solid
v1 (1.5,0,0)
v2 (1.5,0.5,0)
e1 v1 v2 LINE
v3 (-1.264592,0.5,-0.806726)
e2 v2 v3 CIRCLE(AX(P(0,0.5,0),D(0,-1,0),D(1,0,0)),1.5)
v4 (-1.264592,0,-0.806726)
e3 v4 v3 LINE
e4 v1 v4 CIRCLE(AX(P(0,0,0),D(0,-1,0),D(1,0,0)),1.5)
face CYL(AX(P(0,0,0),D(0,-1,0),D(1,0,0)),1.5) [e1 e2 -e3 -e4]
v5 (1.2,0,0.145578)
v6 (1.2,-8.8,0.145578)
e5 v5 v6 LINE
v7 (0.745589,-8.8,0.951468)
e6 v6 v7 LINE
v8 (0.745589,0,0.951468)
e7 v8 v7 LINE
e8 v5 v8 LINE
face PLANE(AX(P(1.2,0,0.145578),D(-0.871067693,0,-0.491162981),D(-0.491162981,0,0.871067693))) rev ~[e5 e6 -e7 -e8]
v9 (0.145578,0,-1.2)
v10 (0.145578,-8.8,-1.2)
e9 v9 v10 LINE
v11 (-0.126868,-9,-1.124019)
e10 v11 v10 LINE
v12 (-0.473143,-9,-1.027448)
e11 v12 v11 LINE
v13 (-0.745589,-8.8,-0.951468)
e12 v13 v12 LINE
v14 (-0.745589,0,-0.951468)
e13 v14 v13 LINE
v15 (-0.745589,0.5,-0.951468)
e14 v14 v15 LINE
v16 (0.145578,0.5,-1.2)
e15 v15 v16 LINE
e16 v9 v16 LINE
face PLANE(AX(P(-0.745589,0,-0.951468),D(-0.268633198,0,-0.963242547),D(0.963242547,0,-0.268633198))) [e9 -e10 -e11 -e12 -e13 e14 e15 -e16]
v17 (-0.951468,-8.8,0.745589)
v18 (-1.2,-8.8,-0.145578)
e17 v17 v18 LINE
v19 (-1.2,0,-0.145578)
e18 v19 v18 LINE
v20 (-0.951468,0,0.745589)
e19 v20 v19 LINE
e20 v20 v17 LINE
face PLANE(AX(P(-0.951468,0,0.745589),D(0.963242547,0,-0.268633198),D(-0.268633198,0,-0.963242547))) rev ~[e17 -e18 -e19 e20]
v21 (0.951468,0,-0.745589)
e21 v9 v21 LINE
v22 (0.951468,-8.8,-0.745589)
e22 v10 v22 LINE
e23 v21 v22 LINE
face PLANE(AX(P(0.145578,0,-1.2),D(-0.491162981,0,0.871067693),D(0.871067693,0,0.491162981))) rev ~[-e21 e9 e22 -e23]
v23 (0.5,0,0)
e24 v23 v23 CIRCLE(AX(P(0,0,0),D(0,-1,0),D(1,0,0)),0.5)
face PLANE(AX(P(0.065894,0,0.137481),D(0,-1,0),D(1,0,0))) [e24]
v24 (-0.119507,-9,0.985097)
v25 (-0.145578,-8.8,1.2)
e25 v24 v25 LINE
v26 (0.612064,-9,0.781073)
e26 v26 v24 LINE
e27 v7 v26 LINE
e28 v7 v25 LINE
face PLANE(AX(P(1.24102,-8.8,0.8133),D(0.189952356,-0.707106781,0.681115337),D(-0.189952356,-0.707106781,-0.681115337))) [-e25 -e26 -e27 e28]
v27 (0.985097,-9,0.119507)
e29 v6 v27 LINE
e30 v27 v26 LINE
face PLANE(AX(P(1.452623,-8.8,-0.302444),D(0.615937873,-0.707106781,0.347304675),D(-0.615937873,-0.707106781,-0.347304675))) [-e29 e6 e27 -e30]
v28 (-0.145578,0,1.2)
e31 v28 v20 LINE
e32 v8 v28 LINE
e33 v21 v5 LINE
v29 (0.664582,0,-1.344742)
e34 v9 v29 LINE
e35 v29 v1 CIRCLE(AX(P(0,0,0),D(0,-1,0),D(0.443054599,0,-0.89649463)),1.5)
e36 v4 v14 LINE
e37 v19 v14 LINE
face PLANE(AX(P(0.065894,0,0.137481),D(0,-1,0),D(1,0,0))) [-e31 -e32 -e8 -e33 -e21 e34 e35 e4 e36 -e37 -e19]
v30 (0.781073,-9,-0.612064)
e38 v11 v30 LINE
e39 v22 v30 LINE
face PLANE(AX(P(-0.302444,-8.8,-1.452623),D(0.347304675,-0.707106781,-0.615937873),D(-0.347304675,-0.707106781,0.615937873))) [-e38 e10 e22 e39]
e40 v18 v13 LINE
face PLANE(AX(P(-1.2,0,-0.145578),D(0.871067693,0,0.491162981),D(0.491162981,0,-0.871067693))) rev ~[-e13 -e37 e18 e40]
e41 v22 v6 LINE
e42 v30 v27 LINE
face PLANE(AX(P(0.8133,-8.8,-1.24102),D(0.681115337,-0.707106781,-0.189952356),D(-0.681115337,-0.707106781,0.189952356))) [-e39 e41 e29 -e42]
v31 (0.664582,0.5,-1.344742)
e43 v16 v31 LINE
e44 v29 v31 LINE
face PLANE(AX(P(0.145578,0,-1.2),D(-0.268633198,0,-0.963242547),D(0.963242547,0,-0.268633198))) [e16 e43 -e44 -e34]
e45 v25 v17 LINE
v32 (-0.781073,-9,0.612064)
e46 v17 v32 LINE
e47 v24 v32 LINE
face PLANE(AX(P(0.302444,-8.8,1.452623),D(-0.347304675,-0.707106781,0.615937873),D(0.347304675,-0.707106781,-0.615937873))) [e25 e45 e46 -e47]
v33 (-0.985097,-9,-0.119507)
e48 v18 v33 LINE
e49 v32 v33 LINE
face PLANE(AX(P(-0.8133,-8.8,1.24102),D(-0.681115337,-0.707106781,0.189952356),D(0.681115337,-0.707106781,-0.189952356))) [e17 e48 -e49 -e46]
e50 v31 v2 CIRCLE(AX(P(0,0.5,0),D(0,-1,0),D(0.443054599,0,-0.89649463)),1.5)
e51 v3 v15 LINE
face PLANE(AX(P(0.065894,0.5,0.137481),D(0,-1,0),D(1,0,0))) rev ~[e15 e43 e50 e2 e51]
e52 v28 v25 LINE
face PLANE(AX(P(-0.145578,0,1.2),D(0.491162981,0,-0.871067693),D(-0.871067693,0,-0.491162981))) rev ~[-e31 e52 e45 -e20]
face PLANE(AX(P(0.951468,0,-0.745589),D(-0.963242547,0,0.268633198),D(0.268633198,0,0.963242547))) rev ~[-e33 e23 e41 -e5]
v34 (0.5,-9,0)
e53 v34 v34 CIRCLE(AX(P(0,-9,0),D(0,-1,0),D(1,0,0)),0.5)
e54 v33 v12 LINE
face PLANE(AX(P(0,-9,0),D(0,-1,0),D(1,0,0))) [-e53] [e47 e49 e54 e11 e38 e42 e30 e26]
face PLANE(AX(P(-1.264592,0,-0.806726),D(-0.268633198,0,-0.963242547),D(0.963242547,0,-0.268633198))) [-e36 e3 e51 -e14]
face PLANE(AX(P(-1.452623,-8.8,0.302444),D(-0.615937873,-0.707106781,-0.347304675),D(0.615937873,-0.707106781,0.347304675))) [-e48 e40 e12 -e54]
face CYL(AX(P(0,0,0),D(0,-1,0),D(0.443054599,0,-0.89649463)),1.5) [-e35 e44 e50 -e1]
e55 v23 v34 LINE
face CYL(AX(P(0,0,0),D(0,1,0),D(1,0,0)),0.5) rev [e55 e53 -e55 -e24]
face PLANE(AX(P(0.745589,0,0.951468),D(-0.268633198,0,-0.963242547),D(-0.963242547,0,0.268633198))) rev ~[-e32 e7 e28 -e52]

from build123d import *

# Parameters (mm, degrees)
F0_R         = 0.5
F1_DEPTH     = 9
F2_T1_DEPTH  = 1.9538472674
F2_T3_DEPTH  = 1.9538472674
F2_T5_DEPTH  = 1.9538472674
F2_T7_DEPTH  = 1.9538472674
F2_T9_DEPTH  = 1.9538472674
F2_T11_DEPTH = 1.9538472674
F2_T13_DEPTH = 1.9538472674
F3_DEPTH     = 0.5


# Not quite as in the source:
# - a fillet or chamfer that OpenCascade refuses, or shapes differently, is made with other operations: its cross-section is extruded or revolved along the edge and cut away or added


with BuildPart() as f1:
    # F0 (on Front) → F1 (new body)
    with BuildSketch(Plane.XZ):
        Polygon((1.2, 0.1455782856), (0.7455887445, 0.9514675304), (-0.1455782856, 1.2), (-0.9514675304, 0.7455887445), (-1.2, -0.1455782856), (-0.7455887445, -0.9514675304), (0.1455782856, -1.2), (0.9514675304, -0.7455887445), align=None)
        Circle(F0_R, mode=Mode.SUBTRACT)
    extrude(amount=F1_DEPTH)

    # F2: chamfer of 0.2 on 8 edges, made by hand

    # F2_s2 → F2_t1 (cut)
    with BuildSketch(Plane(origin=(0.8509666159, 0, 0.4798287244), x_dir=(0, 1, 0), z_dir=(-0.871067693, 0, -0.4911629813))):
        Polygon((-8.8, -1.1167838964), (-9, -0.9167838964), (-9, -1.1167838964), align=None)
    extrude(amount=F2_T1_DEPTH, mode=Mode.SUBTRACT)

    # F2_s4 → F2_t3 (cut)
    with BuildSketch(Plane(origin=(0.2624341198, 0, 0.9410144095), x_dir=(0, 1, 0), z_dir=(-0.2686331979, 0, -0.9632425473))):
        Polygon((-8.8, -1.1167838964), (-9, -0.9167838964), (-9, -1.1167838964), align=None)
    extrude(amount=F2_T3_DEPTH, mode=Mode.SUBTRACT)

    # F2_s6 → F2_t5 (cut)
    with BuildSketch(Plane(origin=(-0.4798287244, 0, 0.8509666159), x_dir=(0, 1, 0), z_dir=(0.4911629813, 0, -0.871067693))):
        Polygon((-8.8, -1.1167838964), (-9, -0.9167838964), (-9, -1.1167838964), align=None)
    extrude(amount=F2_T5_DEPTH, mode=Mode.SUBTRACT)

    # F2_s8 → F2_t7 (cut)
    with BuildSketch(Plane(origin=(-0.8509666159, 0, -0.4798287244), x_dir=(0, 1, 0), z_dir=(0.871067693, 0, 0.4911629813))):
        Polygon((-8.8, -1.1167838964), (-9, -0.9167838964), (-9, -1.1167838964), align=None)
    extrude(amount=F2_T7_DEPTH, mode=Mode.SUBTRACT)

    # F2_s10 → F2_t9 (cut)
    with BuildSketch(Plane(origin=(-0.2624341198, 0, -0.9410144095), x_dir=(0, 1, 0), z_dir=(0.2686331979, 0, 0.9632425473))):
        Polygon((-8.8, -1.1167838964), (-9, -0.9167838964), (-9, -1.1167838964), align=None)
    extrude(amount=F2_T9_DEPTH, mode=Mode.SUBTRACT)

    # F2_s12 → F2_t11 (cut)
    with BuildSketch(Plane(origin=(0.4798287244, 0, -0.8509666159), x_dir=(0, 1, 0), z_dir=(-0.4911629813, 0, 0.871067693))):
        Polygon((-8.8, -1.1167838964), (-9, -0.9167838964), (-9, -1.1167838964), align=None)
    extrude(amount=F2_T11_DEPTH, mode=Mode.SUBTRACT)

    # F2_s14 → F2_t13 (cut)
    with BuildSketch(Plane(origin=(0.9410144095, 0, -0.2624341198), x_dir=(0, 1, 0), z_dir=(-0.9632425473, 0, 0.2686331979))):
        Polygon((-8.8, -1.1167838964), (-9, -0.9167838964), (-9, -1.1167838964), align=None)
    extrude(amount=F2_T13_DEPTH, mode=Mode.SUBTRACT)

    # F0 (on Front) → F3 (join)
    with BuildSketch(Plane.XZ):
        with BuildLine():
            Line((-0.1455782856, 1.2), (0.7455887445, 0.9514675304))
            Line((0.7455887445, 0.9514675304), (1.2, 0.1455782856))
            Line((1.2, 0.1455782856), (0.9514675304, -0.7455887445))
            Line((0.9514675304, -0.7455887445), (0.1455782856, -1.2))
            Line((0.1455782856, -1.2), (0.6645818987, -1.3447419455))
            ThreePointArc((0.6645818987, -1.3447419455), (1.2741414458, -0.7915576896), (1.5, 0))
            ThreePointArc((1.5, 0), (-0.4201853542, 1.4399459254), (-1.2645923575, -0.8067255849))
            Line((-1.2645923575, -0.8067255849), (-0.7455887445, -0.9514675304))
            Line((-0.7455887445, -0.9514675304), (-1.2, -0.1455782856))
            Line((-1.2, -0.1455782856), (-0.9514675304, 0.7455887445))
            Line((-0.9514675304, 0.7455887445), (-0.1455782856, 1.2))
        make_face()
        Polygon((1.2, 0.1455782856), (0.7455887445, 0.9514675304), (-0.1455782856, 1.2), (-0.9514675304, 0.7455887445), (-1.2, -0.1455782856), (-0.7455887445, -0.9514675304), (0.1455782856, -1.2), (0.9514675304, -0.7455887445), align=None)
        Circle(F0_R, mode=Mode.SUBTRACT)
        Circle(F0_R)
    extrude(amount=-F3_DEPTH)


solid = f1.part
